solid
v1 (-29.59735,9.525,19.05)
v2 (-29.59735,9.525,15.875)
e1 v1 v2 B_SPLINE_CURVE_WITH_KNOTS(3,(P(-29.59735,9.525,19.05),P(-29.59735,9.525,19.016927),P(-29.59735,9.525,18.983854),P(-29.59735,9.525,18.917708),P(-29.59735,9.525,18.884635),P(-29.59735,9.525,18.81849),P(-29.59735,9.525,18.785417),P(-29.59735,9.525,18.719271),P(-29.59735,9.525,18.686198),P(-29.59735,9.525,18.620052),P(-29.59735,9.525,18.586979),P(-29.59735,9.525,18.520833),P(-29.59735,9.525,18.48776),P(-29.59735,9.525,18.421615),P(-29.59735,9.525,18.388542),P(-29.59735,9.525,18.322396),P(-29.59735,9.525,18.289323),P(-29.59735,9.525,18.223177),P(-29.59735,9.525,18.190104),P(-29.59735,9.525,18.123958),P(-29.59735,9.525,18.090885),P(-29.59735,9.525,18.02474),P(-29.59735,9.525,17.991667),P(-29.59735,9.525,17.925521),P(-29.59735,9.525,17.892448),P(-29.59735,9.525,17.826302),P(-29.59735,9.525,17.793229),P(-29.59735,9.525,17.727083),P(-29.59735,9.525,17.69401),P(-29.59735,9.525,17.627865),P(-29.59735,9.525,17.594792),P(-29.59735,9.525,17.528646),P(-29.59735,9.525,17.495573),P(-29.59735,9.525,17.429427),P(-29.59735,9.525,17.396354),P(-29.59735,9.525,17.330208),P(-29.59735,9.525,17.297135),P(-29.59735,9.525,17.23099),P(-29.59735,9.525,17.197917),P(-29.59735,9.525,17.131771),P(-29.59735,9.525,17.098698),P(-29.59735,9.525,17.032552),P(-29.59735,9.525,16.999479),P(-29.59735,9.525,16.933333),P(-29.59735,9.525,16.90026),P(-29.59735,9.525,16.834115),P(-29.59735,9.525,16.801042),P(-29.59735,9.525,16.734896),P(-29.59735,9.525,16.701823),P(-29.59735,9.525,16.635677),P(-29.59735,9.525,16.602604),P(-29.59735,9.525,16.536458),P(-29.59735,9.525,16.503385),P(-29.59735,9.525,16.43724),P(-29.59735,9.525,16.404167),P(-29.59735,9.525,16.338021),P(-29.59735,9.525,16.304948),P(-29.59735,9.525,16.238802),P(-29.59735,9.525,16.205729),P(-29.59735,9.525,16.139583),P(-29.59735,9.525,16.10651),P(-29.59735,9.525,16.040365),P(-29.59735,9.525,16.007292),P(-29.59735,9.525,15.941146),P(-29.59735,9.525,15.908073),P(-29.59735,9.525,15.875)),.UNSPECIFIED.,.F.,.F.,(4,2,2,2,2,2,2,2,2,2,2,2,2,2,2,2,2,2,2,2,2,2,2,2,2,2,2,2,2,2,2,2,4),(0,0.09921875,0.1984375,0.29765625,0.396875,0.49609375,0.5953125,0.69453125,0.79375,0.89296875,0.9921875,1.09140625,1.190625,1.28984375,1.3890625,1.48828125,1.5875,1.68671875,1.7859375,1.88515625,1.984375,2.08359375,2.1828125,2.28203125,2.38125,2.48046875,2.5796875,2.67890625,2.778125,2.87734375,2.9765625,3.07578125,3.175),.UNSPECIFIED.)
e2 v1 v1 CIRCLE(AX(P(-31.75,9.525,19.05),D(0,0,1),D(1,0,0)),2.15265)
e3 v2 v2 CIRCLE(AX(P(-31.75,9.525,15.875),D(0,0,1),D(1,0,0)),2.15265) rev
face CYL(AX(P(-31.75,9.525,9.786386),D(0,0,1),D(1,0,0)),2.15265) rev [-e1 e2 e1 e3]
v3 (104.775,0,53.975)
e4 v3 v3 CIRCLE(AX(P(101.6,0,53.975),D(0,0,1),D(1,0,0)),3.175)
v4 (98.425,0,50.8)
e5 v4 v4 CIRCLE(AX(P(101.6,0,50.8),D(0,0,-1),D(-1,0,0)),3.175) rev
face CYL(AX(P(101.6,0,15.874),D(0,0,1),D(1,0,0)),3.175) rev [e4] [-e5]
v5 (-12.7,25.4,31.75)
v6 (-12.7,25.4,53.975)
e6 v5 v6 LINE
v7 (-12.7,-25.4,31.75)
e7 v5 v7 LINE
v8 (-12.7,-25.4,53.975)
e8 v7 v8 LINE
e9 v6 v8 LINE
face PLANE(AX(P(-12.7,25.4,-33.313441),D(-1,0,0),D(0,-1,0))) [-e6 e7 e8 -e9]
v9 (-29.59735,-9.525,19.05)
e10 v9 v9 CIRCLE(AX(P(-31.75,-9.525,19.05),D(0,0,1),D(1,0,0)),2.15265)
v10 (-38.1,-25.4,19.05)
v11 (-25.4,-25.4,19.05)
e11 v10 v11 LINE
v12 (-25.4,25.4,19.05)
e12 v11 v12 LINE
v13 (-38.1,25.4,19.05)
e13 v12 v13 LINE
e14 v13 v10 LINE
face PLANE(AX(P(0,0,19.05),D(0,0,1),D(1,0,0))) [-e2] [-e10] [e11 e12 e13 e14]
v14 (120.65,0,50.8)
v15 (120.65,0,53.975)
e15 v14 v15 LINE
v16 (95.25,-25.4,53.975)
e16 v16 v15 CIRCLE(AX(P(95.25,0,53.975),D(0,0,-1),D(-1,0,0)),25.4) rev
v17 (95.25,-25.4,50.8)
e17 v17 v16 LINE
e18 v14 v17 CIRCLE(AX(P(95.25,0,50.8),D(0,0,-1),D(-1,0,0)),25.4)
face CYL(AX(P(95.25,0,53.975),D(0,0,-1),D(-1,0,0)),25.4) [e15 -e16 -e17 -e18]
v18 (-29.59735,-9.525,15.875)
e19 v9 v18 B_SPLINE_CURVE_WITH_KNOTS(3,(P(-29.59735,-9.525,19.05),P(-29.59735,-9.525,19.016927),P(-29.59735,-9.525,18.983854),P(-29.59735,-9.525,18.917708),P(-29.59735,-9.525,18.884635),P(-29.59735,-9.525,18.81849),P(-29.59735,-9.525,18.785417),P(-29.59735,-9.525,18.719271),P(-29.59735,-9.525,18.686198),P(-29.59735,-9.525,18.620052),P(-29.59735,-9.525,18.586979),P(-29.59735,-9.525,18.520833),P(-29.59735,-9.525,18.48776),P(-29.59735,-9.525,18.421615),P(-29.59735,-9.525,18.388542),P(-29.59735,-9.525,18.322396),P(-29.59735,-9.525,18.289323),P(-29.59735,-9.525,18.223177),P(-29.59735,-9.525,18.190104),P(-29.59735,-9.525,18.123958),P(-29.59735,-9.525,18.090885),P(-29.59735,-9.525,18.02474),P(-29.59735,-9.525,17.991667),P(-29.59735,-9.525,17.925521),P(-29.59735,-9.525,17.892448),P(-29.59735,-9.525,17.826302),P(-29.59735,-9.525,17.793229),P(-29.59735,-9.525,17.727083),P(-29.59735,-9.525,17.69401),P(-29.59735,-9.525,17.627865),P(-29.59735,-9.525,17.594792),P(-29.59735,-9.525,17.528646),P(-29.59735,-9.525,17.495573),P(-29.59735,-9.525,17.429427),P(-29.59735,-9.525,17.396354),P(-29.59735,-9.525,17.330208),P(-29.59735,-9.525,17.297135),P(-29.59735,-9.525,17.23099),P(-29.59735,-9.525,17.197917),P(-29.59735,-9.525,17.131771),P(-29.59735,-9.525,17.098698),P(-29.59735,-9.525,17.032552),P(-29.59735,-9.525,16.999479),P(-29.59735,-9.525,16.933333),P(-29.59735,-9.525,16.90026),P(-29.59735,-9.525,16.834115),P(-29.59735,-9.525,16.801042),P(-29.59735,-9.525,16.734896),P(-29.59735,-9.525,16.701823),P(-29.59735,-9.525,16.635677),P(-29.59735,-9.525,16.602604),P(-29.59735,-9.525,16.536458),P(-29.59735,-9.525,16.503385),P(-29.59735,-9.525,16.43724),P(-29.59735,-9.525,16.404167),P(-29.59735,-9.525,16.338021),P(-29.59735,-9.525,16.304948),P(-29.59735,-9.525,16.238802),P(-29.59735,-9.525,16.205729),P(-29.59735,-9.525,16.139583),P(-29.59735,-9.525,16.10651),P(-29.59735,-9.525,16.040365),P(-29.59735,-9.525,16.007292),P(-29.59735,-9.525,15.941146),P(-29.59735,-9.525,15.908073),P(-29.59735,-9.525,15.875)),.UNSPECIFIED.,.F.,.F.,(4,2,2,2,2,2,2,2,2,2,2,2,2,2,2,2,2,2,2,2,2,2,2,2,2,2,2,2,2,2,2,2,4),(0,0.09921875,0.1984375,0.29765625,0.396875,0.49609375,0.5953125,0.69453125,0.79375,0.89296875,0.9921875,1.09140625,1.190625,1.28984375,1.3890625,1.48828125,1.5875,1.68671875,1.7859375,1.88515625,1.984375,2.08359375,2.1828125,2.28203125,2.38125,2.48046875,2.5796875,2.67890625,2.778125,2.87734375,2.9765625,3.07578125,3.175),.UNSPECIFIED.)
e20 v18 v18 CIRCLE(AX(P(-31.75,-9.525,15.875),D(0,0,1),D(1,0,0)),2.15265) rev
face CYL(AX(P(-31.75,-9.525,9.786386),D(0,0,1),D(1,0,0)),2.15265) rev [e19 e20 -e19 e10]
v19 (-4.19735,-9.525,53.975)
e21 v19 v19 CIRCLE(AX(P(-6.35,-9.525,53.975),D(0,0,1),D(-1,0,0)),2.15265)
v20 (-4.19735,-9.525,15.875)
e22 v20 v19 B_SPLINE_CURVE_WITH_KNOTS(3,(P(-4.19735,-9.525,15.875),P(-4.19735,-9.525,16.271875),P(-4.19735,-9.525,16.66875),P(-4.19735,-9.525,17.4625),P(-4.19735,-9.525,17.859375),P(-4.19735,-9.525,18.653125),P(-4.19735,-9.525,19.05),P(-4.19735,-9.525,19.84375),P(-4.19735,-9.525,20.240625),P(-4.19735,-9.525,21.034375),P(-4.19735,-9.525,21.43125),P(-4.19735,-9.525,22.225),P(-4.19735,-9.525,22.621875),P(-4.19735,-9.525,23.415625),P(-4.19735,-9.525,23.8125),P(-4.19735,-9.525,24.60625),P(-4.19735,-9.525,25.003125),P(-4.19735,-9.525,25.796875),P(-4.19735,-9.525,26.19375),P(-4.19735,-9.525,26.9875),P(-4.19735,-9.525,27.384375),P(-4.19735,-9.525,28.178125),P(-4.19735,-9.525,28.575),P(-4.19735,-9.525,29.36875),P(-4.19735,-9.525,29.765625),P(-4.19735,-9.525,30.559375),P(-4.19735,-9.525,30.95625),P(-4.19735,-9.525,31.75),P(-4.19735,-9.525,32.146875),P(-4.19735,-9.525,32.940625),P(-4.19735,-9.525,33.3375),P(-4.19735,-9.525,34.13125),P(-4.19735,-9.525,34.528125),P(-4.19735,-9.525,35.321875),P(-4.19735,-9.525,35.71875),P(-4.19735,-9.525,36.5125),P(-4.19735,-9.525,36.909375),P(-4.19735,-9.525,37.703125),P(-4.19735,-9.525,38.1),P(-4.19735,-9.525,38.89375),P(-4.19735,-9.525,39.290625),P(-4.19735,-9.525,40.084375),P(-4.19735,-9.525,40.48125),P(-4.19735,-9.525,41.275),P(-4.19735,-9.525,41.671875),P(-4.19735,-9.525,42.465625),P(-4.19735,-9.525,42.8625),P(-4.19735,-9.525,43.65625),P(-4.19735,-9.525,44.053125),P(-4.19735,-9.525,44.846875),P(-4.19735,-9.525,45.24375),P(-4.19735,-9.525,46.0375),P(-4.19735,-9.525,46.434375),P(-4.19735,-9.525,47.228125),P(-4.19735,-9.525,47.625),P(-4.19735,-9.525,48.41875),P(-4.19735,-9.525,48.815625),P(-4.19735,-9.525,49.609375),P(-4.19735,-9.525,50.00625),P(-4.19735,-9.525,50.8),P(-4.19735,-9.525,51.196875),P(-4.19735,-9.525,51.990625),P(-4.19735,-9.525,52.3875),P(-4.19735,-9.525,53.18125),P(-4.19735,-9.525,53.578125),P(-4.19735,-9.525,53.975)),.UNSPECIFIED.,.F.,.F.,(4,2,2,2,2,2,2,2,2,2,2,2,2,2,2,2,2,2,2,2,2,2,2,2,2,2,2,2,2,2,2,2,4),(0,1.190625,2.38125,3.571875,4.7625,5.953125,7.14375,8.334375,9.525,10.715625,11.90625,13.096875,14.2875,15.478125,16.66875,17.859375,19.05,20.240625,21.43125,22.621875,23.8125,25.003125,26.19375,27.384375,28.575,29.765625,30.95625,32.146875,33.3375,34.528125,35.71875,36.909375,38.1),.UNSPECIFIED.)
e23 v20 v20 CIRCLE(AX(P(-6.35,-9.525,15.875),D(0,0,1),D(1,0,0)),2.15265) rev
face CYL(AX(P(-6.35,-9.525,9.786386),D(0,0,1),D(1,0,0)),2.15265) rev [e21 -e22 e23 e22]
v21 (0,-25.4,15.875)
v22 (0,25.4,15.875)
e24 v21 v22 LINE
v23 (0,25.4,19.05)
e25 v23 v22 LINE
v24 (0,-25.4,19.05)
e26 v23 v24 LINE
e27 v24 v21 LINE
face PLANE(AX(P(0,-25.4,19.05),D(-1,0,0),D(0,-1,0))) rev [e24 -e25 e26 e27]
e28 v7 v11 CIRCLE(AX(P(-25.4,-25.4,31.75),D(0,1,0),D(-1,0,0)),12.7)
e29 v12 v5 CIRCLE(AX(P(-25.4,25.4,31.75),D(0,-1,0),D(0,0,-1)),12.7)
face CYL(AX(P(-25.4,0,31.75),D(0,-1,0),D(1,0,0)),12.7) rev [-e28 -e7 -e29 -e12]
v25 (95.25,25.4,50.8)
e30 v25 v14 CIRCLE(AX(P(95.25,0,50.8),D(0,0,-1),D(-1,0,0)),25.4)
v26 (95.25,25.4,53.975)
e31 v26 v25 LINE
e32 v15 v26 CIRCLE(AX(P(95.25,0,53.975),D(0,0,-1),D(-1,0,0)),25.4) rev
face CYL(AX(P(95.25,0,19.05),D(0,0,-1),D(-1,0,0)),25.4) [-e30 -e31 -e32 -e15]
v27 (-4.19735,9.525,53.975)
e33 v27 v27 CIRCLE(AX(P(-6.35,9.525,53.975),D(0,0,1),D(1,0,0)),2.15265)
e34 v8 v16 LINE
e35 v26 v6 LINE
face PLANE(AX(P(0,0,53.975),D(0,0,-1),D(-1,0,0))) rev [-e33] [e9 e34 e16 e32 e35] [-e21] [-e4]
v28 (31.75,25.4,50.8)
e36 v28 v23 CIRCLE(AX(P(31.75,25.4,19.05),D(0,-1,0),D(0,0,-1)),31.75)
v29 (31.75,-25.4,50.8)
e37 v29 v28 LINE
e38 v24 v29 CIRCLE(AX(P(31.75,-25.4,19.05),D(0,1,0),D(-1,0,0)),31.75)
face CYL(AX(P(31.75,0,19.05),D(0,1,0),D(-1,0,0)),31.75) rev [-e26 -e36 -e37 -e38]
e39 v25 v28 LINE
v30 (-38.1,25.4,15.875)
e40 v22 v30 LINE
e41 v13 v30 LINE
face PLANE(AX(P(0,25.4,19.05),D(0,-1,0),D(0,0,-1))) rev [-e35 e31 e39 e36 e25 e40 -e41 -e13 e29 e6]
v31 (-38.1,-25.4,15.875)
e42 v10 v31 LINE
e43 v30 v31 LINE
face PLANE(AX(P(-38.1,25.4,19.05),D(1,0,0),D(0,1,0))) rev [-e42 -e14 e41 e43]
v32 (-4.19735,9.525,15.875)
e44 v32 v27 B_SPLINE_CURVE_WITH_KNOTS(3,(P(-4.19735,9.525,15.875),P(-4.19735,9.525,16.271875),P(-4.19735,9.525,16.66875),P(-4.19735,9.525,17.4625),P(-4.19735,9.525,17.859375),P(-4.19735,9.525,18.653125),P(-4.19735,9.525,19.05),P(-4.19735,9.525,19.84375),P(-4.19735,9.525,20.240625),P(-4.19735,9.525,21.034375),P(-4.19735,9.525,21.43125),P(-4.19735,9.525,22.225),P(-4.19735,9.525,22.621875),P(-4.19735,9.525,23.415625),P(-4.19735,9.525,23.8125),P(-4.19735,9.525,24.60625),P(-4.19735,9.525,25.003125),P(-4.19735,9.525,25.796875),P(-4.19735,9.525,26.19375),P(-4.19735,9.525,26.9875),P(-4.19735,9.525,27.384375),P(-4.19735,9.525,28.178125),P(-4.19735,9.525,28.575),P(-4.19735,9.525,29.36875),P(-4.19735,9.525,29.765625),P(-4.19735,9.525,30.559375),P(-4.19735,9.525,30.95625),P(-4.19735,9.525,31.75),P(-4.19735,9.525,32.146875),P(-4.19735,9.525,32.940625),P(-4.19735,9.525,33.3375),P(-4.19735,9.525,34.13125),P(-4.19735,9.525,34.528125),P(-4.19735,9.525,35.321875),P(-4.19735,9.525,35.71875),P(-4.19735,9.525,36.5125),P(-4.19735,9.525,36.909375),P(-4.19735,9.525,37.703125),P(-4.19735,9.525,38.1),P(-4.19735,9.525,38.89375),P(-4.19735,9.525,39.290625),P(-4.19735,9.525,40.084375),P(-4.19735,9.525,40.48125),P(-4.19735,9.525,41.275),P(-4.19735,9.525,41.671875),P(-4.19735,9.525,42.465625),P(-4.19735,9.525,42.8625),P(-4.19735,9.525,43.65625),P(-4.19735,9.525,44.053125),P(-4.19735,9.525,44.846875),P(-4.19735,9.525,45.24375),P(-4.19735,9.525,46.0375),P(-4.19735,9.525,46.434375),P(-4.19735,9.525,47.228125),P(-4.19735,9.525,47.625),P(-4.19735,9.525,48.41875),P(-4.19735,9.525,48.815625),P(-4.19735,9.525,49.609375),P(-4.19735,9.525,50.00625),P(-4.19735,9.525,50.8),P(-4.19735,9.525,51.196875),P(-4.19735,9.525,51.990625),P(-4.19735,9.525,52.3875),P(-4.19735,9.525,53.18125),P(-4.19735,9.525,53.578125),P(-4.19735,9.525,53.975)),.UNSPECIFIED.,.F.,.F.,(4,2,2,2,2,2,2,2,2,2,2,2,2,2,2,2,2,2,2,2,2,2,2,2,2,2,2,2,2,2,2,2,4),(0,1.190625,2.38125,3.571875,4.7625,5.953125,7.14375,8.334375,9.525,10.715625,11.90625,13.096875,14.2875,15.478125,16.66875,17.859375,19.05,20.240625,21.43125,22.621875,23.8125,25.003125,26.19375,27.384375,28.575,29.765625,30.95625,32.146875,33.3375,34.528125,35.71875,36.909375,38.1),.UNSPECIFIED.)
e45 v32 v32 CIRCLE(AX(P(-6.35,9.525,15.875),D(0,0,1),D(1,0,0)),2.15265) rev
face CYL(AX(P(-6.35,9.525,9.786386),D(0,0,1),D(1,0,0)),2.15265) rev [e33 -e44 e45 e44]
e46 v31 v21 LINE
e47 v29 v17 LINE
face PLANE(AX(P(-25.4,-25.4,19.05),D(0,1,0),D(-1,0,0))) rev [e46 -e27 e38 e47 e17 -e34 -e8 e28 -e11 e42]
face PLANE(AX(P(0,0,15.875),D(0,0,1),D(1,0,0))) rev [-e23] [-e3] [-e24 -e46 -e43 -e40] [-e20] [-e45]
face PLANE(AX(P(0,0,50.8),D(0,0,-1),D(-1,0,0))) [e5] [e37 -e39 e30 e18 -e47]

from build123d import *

# Parameters (mm, degrees)
BOSS_EXTRUDE1_DEPTH = 3.175
SKETCH2_W           = 12.7
SKETCH2_H           = 50.8
BOSS_EXTRUDE2_DEPTH = 31.75
FILLET1_R           = 12.7
BOSS_EXTRUDE3_DEPTH = 3.175
FILLET2_R           = 31.75
SKETCH4_R           = 2.15265
CUT_EXTRUDE1_DEPTH  = 38.1
FILLET3_R           = 25.4
CUT_EXTRUDE4_REACH  = 131.047
SKETCH7_R           = 3.175


with BuildPart() as part:
    # Sketch1 → Boss-Extrude1 (new body)
    with BuildSketch(Plane.XY.offset(15.875)):
        Polygon((-38.1, 25.4), (-38.1, -25.4), (-25.4, -25.4), (0, -25.4), (0, 25.4), align=None)
    extrude(amount=BOSS_EXTRUDE1_DEPTH)

    # Sketch2 → Boss-Extrude2 (add)
    with BuildSketch(Plane.XY.offset(50.8)):
        with Locations((-6.35, 0)):
            Rectangle(SKETCH2_W, SKETCH2_H)
    extrude(amount=-BOSS_EXTRUDE2_DEPTH)

    # Fillet1
    fillet1_edges = [part.edges().sort_by_distance(p)[0] for p in [
        (-12.7, 0, 19.05),
    ]]
    fillet(fillet1_edges, radius=FILLET1_R)

    # Sketch3 → Boss-Extrude3 (add)
    with BuildSketch(Plane.XY.offset(50.8)):
        Polygon((0, 25.4), (101.6, 25.4), (120.65, 25.4), (120.65, -25.4), (0, -25.4), (-12.7, -25.4), (-12.7, 25.4), align=None)
    extrude(amount=BOSS_EXTRUDE3_DEPTH)

    # Fillet2
    fillet2_edges = [part.edges().sort_by_distance(p)[0] for p in [
        (0, 0, 50.8),
    ]]
    fillet(fillet2_edges, radius=FILLET2_R)

    # Sketch4 → Cut-Extrude1 (cut)
    with BuildSketch(Plane.XY.offset(53.975)):
        with Locations((-6.35, 9.525)):
            Circle(SKETCH4_R)
        with Locations((-31.75, 9.525)):
            Circle(SKETCH4_R)
        with Locations((-6.35, -9.525)):
            Circle(SKETCH4_R)
        with Locations((-31.75, -9.525)):
            Circle(SKETCH4_R)
    extrude(amount=-CUT_EXTRUDE1_DEPTH, mode=Mode.SUBTRACT)

    # Fillet3
    fillet3_edges = [part.edges().sort_by_distance(p)[0] for p in [
        (120.65, -25.4, 52.3875),
        (120.65, 25.4, 52.3875),
    ]]
    fillet(fillet3_edges, radius=FILLET3_R - 0.0001)  # a hair under: the kernel refuses the full size

    # Sketch7 → Cut-Extrude4 (cut, up to next)
    with BuildSketch(Plane.XY.offset(53.975), mode=Mode.PRIVATE) as cut_extrude4_sk1:
        with Locations((101.6, 0)):
            Circle(SKETCH7_R)
    cut_extrude4_tool1 = extrude(cut_extrude4_sk1.sketch, amount=-CUT_EXTRUDE4_REACH, mode=Mode.PRIVATE) & part.part
    add(cut_extrude4_tool1.solids().sort_by_distance((101.6, 0, 53.975))[0], mode=Mode.SUBTRACT)


solid = part.part
